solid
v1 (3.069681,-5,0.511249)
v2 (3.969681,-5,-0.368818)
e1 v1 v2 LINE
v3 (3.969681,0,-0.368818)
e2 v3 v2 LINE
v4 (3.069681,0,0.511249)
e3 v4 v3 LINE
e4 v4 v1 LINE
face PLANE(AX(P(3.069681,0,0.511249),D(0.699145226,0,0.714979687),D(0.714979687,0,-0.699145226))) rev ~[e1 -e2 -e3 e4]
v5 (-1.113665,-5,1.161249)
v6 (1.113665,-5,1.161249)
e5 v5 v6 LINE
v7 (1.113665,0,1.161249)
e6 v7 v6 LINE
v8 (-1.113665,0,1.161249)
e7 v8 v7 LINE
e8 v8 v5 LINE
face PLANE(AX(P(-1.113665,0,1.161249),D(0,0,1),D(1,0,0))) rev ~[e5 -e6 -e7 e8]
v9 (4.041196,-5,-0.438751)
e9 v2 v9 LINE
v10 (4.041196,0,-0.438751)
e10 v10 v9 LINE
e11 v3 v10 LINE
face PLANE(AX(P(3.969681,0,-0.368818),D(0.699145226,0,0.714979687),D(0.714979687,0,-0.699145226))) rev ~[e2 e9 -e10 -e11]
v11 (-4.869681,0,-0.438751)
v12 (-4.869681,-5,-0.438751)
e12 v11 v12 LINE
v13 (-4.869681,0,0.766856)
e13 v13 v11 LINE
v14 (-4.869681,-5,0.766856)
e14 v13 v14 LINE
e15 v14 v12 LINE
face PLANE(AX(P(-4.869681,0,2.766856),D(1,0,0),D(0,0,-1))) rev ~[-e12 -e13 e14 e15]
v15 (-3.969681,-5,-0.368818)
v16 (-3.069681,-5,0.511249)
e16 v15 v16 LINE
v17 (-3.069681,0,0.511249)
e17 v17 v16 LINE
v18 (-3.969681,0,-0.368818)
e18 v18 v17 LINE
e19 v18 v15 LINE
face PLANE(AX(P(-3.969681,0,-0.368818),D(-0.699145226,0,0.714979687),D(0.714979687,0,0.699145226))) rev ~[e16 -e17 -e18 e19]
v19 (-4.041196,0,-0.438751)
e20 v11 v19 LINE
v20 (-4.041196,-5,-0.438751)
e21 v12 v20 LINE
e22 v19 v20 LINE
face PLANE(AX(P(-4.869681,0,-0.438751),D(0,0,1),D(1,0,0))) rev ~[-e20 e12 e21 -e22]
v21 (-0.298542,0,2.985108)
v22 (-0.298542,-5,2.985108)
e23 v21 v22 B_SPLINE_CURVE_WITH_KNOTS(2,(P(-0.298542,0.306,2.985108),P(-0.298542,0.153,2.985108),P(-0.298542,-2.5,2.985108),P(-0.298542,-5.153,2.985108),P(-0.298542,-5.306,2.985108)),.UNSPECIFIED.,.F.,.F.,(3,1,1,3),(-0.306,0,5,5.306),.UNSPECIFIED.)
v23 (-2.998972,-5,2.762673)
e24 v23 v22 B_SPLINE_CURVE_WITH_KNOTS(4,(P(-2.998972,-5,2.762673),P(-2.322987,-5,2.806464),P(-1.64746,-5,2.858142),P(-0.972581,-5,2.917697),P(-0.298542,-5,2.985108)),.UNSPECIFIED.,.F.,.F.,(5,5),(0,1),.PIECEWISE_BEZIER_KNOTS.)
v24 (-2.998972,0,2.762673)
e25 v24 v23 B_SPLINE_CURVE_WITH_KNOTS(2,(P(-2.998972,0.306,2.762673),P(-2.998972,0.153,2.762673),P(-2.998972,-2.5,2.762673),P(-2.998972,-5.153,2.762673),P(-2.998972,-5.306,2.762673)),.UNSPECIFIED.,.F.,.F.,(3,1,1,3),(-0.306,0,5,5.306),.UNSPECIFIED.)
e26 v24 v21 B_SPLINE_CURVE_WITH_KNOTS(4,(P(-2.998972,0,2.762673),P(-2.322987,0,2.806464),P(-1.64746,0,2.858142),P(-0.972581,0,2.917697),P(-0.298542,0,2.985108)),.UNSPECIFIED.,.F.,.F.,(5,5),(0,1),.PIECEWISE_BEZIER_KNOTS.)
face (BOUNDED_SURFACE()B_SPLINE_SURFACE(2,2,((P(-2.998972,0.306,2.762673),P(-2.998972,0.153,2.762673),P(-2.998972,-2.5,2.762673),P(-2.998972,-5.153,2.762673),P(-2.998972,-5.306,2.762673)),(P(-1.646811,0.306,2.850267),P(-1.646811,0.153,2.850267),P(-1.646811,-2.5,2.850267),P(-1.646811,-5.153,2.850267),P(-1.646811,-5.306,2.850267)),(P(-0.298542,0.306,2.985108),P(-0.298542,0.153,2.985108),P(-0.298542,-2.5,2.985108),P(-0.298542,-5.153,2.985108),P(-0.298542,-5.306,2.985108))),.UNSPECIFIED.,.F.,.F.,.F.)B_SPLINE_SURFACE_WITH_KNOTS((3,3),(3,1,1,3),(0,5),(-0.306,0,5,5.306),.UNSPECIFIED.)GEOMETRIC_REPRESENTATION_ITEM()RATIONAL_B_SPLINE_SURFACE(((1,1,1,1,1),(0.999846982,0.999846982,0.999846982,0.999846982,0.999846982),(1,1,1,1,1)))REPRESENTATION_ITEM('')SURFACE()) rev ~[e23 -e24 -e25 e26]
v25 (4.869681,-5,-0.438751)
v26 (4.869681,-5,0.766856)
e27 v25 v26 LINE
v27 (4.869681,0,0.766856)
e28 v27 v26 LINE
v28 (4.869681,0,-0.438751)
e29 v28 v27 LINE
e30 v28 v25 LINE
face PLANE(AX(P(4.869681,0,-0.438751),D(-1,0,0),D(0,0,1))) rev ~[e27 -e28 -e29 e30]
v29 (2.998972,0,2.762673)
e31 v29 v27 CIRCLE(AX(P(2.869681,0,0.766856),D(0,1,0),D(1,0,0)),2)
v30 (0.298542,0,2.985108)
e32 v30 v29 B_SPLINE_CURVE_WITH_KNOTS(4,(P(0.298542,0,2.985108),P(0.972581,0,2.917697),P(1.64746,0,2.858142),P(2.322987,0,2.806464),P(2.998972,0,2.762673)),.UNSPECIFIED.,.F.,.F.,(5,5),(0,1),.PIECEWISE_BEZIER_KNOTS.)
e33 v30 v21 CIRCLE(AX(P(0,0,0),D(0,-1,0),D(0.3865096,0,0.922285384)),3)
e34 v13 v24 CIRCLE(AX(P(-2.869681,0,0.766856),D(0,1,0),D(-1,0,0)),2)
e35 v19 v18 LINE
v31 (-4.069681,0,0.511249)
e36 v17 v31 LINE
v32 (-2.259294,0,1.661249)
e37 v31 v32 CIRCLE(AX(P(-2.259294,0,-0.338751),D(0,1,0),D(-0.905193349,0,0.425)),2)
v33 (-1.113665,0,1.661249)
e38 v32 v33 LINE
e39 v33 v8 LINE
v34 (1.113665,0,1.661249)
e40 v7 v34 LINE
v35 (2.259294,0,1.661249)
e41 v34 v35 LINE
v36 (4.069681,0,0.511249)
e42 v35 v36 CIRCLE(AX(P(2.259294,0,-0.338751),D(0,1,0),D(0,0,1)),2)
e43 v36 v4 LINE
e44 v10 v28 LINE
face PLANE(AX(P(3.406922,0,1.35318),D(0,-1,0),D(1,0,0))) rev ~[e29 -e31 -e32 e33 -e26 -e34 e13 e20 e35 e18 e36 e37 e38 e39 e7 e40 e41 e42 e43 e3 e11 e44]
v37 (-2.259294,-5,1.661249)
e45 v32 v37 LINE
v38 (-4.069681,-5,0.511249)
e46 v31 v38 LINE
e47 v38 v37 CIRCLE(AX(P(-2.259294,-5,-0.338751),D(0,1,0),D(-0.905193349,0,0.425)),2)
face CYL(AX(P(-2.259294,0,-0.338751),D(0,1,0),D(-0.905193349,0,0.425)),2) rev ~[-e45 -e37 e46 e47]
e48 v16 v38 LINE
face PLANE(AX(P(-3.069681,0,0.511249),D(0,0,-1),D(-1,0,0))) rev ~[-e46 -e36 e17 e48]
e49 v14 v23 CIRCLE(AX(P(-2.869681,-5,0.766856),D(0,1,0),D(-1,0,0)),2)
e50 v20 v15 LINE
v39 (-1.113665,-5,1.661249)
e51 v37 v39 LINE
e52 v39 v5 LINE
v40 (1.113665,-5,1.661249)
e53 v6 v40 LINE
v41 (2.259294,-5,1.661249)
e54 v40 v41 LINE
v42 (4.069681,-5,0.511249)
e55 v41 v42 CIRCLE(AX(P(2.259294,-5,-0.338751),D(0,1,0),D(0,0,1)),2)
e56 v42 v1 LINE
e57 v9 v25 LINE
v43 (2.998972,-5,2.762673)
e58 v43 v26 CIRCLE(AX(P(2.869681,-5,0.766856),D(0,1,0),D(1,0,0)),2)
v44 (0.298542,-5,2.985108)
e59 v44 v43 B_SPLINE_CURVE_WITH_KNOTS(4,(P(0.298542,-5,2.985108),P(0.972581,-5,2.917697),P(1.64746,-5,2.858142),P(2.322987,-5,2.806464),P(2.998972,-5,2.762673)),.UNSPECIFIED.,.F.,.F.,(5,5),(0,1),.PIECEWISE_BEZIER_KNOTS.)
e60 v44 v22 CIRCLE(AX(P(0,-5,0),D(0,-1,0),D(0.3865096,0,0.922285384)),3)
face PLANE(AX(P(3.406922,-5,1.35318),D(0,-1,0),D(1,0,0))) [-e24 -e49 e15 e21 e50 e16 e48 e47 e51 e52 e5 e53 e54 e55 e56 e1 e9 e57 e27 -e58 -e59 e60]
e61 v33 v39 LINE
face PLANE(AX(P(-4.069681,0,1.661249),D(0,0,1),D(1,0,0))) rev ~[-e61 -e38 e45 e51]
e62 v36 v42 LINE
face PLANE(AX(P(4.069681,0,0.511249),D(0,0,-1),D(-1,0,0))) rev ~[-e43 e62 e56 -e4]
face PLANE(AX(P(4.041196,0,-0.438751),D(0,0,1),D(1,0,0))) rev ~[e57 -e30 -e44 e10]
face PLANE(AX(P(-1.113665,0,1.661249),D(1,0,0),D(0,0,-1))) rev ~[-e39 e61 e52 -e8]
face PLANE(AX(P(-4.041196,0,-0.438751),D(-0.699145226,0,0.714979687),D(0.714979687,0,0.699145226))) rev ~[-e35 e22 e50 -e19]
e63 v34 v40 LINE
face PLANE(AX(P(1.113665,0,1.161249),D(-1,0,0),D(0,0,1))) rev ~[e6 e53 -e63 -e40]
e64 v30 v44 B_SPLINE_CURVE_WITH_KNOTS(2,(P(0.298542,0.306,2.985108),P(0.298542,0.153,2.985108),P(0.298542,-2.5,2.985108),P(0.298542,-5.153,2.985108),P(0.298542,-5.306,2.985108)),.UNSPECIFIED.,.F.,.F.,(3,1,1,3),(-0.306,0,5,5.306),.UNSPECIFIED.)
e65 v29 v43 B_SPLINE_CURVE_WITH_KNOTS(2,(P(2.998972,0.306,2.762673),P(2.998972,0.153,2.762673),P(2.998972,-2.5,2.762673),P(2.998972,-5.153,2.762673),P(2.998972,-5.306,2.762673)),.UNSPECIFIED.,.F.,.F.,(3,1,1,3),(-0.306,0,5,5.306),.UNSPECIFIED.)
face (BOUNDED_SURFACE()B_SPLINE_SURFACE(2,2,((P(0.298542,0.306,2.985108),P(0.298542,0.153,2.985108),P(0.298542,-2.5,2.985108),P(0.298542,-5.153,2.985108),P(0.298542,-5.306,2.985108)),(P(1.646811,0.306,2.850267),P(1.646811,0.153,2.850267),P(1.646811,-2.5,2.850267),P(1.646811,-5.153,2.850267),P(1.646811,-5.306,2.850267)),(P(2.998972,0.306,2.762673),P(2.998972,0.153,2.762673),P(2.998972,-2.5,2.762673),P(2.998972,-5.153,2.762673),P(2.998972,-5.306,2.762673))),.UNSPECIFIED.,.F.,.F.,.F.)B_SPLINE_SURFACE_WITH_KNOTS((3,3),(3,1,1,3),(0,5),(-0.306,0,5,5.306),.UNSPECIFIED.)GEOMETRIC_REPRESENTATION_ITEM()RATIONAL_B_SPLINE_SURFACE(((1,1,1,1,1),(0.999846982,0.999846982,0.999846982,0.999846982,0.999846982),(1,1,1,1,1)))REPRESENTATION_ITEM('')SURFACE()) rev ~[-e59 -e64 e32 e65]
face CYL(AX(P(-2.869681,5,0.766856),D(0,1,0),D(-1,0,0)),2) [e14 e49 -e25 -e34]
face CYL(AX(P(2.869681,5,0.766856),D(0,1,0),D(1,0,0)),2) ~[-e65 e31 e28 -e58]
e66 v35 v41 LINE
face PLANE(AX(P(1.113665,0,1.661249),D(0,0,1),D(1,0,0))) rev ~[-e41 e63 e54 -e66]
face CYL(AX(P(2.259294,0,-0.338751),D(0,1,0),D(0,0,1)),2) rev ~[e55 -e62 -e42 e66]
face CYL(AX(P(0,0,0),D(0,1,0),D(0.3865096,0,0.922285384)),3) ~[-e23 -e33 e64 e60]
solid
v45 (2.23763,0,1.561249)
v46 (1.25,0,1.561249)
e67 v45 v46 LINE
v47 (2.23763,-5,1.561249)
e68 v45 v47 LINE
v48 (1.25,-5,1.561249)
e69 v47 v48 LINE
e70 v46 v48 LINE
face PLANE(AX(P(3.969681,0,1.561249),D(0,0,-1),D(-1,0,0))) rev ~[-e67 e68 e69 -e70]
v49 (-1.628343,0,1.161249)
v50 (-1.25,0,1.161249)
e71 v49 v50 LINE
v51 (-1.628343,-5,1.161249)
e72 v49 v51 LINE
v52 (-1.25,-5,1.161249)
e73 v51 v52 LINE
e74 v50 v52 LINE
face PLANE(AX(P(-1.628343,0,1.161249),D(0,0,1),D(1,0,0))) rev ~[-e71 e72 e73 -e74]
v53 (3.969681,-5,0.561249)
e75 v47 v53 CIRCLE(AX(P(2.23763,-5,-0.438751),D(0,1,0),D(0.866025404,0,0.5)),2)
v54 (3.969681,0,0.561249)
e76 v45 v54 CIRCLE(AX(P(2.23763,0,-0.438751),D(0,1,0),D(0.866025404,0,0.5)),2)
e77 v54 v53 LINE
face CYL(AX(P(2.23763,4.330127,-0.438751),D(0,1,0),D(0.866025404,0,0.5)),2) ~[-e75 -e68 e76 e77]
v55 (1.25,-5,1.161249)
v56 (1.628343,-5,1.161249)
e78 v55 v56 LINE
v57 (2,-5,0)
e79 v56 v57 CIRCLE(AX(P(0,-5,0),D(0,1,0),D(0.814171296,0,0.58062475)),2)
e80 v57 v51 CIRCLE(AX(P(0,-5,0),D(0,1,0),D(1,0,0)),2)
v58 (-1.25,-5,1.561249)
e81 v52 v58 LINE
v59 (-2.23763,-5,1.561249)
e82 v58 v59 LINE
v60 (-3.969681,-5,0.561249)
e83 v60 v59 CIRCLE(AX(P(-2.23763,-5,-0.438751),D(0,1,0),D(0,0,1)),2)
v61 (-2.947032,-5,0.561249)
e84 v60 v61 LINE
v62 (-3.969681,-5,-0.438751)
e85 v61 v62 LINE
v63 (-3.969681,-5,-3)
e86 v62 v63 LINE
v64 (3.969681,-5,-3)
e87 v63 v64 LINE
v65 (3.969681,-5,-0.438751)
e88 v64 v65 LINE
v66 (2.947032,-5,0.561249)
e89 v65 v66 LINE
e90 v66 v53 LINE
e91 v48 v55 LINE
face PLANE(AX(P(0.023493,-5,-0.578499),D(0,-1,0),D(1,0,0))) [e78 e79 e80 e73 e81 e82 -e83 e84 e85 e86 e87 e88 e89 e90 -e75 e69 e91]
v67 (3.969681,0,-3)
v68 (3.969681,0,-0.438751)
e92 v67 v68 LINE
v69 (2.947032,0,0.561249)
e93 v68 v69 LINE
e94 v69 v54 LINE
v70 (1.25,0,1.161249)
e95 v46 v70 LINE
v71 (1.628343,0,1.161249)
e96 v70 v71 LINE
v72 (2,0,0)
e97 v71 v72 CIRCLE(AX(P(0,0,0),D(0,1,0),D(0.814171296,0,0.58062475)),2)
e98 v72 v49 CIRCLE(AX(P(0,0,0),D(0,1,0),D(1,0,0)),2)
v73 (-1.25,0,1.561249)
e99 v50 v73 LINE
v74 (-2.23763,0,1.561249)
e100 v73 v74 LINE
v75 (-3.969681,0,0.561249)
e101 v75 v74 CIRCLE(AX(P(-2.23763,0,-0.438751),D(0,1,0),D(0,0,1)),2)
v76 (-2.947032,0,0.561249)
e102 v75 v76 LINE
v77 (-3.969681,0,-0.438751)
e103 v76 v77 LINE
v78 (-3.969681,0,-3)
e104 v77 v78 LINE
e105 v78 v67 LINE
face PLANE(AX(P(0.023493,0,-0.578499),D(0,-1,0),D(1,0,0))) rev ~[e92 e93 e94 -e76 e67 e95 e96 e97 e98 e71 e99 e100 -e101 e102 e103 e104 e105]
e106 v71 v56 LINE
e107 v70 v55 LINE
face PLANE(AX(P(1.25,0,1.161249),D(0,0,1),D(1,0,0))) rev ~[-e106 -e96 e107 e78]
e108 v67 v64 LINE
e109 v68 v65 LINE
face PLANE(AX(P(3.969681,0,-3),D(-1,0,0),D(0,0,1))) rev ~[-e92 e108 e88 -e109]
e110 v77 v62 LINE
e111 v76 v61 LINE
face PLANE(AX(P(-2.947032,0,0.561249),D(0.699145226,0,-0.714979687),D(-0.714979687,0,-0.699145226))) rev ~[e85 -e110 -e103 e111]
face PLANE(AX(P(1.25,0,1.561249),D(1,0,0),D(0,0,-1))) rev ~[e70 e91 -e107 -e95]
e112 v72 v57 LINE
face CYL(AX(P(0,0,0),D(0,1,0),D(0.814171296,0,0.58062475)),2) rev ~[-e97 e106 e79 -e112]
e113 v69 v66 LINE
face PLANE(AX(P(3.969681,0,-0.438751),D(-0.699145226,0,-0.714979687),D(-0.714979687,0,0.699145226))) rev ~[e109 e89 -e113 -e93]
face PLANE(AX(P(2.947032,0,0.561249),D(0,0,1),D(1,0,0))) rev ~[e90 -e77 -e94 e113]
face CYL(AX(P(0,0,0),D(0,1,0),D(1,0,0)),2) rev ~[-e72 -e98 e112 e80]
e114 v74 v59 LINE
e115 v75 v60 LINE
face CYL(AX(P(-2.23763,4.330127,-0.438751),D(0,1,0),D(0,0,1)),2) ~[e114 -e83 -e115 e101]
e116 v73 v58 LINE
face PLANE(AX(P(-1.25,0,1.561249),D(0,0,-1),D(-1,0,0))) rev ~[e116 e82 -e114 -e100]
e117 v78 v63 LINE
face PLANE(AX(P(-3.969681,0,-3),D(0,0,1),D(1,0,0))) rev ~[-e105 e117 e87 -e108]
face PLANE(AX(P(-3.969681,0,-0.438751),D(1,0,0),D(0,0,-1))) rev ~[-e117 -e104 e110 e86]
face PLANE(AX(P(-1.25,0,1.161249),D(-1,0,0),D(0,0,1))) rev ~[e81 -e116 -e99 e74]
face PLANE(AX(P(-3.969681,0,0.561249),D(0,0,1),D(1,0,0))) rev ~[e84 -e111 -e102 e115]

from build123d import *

# Parameters (mm, degrees)
F1_DEPTH      = 5
F2_T1_DEPTH   = 13.6602540378
F2_2_T1_DEPTH = 5
F2_2_T3_DEPTH = 5
F2_2_T5_DEPTH = 15
F2_2_T7_DEPTH = 15
F3_R          = 77.4463937181


# Not quite as in the source:
# - a fillet or chamfer that OpenCascade refuses, or shapes differently, is made with other operations: its cross-section is extruded or revolved along the edge and cut away or added
# - a feature names something its author has since deleted; it is built from what else it names


with BuildPart() as f1:
    # F0 (on Front) → F1 (new body)
    with BuildSketch(Plane.XZ):
        with BuildLine():
            ThreePointArc((1.6283425928, 1.1612494996), (1.9048208821, 0.609637111), (2, 0))
            ThreePointArc((2, 0), (-0.609637111, -1.9048208821), (-1.6283425928, 1.1612494996))
            ThreePointArc((-1.6283425928, 1.1612494996), (-1.4530017276, 1.3743311026), (-1.25, 1.5612494996))
            Line((-1.25, 1.5612494996), (-2.5617376915, 1.5612494996))
            ThreePointArc((-2.5617376915, 1.5612494996), (-2.7993993156, 1.0785932838), (-2.9470322359, 0.5612494996))
            ThreePointArc((-2.9470322359, 0.5612494996), (-2.3112494996, -1.9126227413), (0, -3))
            ThreePointArc((0, -3), (2.1213203436, -2.1213203436), (3, 0))
            ThreePointArc((3, 0), (2.9867287044, 0.2818716839), (2.9470322359, 0.5612494996))
            ThreePointArc((2.9470322359, 0.5612494996), (2.7993993156, 1.0785932838), (2.5617376915, 1.5612494996))
            Line((2.5617376915, 1.5612494996), (1.25, 1.5612494996))
            ThreePointArc((1.25, 1.5612494996), (1.4530017276, 1.3743311026), (1.6283425928, 1.1612494996))
        make_face()
        with BuildLine():
            ThreePointArc((0, -3), (-2.3112494996, -1.9126227413), (-2.9470322359, 0.5612494996))
            Line((-2.9470322359, 0.5612494996), (-3.9696805516, -0.4387505004))
            Line((-3.9696805516, -0.4387505004), (-3.9696805516, -3))
            Line((-3.9696805516, -3), (0, -3))
        make_face()
        with BuildLine():
            ThreePointArc((-2.9470322359, 0.5612494996), (-2.7993993156, 1.0785932838), (-2.5617376915, 1.5612494996))
            Line((-2.5617376915, 1.5612494996), (-3.9696805516, 1.5612494996))
            Line((-3.9696805516, 1.5612494996), (-3.9696805516, 0.5612494996))
            Line((-3.9696805516, 0.5612494996), (-2.9470322359, 0.5612494996))
        make_face()
        with BuildLine():
            Line((3.9696805516, 1.5612494996), (2.5617376915, 1.5612494996))
            ThreePointArc((2.5617376915, 1.5612494996), (2.7993993156, 1.0785932838), (2.9470322359, 0.5612494996))
            Line((2.9470322359, 0.5612494996), (3.9696805516, 0.5612494996))
            Line((3.9696805516, 0.5612494996), (3.9696805516, 1.5612494996))
        make_face()
        with BuildLine():
            Line((3.9696805516, -0.4387505004), (2.9470322359, 0.5612494996))
            ThreePointArc((2.9470322359, 0.5612494996), (2.9867287044, 0.2818716839), (3, 0))
            ThreePointArc((3, 0), (2.1213203436, -2.1213203436), (0, -3))
            Line((0, -3), (3.9696805516, -3))
            Line((3.9696805516, -3), (3.9696805516, -0.4387505004))
        make_face()
        with BuildLine():
            ThreePointArc((-1.25, 1.5612494996), (-1.4530017276, 1.3743311026), (-1.6283425928, 1.1612494996))
            Line((-1.6283425928, 1.1612494996), (-1.25, 1.1612494996))
            Line((-1.25, 1.1612494996), (-1.25, 1.5612494996))
        make_face()
        with BuildLine():
            Line((1.25, 1.1612494996), (1.6283425928, 1.1612494996))
            ThreePointArc((1.6283425928, 1.1612494996), (1.4530017276, 1.3743311026), (1.25, 1.5612494996))
            Line((1.25, 1.5612494996), (1.25, 1.1612494996))
        make_face()
    extrude(amount=F1_DEPTH)

    # F2: fillet of radius 2 on 2 edges, made by hand

    # F2_s2 → F2_t1 (cut)
    with BuildSketch(Plane.XZ.offset(-4.3301270189)):
        with BuildLine():
            ThreePointArc((-2.237629744, 1.5612494996), (-3.237629744, 1.2933003072), (-3.9696805516, 0.5612494996))
            Line((-3.9696805516, 0.5612494996), (-3.9696805516, 1.5612494996))
            Line((-3.9696805516, 1.5612494996), (-2.237629744, 1.5612494996))
        make_face()
        with BuildLine():
            ThreePointArc((3.9696805516, 0.5612494996), (3.237629744, 1.2933003072), (2.237629744, 1.5612494996))
            Line((2.237629744, 1.5612494996), (3.9696805516, 1.5612494996))
            Line((3.9696805516, 1.5612494996), (3.9696805516, 0.5612494996))
        make_face()
    extrude(amount=F2_T1_DEPTH, mode=Mode.SUBTRACT)


with BuildPart() as f1b:
    # F0 (on Front) → F1, piece 2 (new body)
    with BuildSketch(Plane.XZ):
        with BuildLine():
            Line((-4.0696805516, 1.6612494996), (-2.4980492589, 1.6612494996))
            ThreePointArc((-2.4980492589, 1.6612494996), (-1.9105132383, 2.3129935508), (-1.1595288015, 2.7668561507))
            Line((-1.1595288015, 2.7668561507), (-4.8696805516, 2.7668561507))
            Line((-4.8696805516, 2.7668561507), (-4.8696805516, -0.4387505004))
            Line((-4.8696805516, -0.4387505004), (-4.0411964515, -0.4387505004))
            Line((-4.0411964515, -0.4387505004), (-3.9696805516, -0.3688184438))
            Line((-3.9696805516, -0.3688184438), (-3.9696805516, 0.5112494996))
            Line((-3.9696805516, 0.5112494996), (-4.0696805516, 0.5112494996))
            Line((-4.0696805516, 0.5112494996), (-4.0696805516, 1.6612494996))
        make_face()
        Polygon((-3.0696805516, 0.5112494996), (-3.9696805516, 0.5112494996), (-3.9696805516, -0.3688184438), align=None)
        with BuildLine():
            ThreePointArc((-1.1136651652, 1.6612494996), (0, 2), (1.1136651652, 1.6612494996))
            Line((1.1136651652, 1.6612494996), (2.4980492589, 1.6612494996))
            ThreePointArc((2.4980492589, 1.6612494996), (1.9105132383, 2.3129935508), (1.1595288015, 2.7668561507))
            ThreePointArc((1.1595288015, 2.7668561507), (0, 3), (-1.1595288015, 2.7668561507))
            ThreePointArc((-1.1595288015, 2.7668561507), (-1.9105132383, 2.3129935508), (-2.4980492589, 1.6612494996))
            Line((-2.4980492589, 1.6612494996), (-1.1136651652, 1.6612494996))
        make_face()
        with BuildLine():
            ThreePointArc((1.1595288015, 2.7668561507), (1.9105132383, 2.3129935508), (2.4980492589, 1.6612494996))
            Line((2.4980492589, 1.6612494996), (4.0696805516, 1.6612494996))
            Line((4.0696805516, 1.6612494996), (4.0696805516, 0.5112494996))
            Line((4.0696805516, 0.5112494996), (3.9696805516, 0.5112494996))
            Line((3.9696805516, 0.5112494996), (3.9696805516, -0.3688184438))
            Line((3.9696805516, -0.3688184438), (4.0411964515, -0.4387505004))
            Line((4.0411964515, -0.4387505004), (4.8696805516, -0.4387505004))
            Line((4.8696805516, -0.4387505004), (4.8696805516, 2.7668561507))
            Line((4.8696805516, 2.7668561507), (1.1595288015, 2.7668561507))
        make_face()
        Polygon((3.9696805516, -0.3688184438), (3.9696805516, 0.5112494996), (3.0696805516, 0.5112494996), align=None)
        with BuildLine():
            Line((1.1136651652, 1.1612494996), (1.1136651652, 1.6612494996))
            ThreePointArc((1.1136651652, 1.6612494996), (0, 2), (-1.1136651652, 1.6612494996))
            Line((-1.1136651652, 1.6612494996), (-1.1136651652, 1.1612494996))
            Line((-1.1136651652, 1.1612494996), (0, 1.1612494996))
            Line((0, 1.1612494996), (1.1136651652, 1.1612494996))
        make_face()
    extrude(amount=F1_DEPTH)

    # F2#2: fillet of radius 2 on 4 edges, made by hand

    # F2_2_s2 → F2_2_t1 (join)
    with BuildSketch(Plane.XZ):
        with BuildLine():
            ThreePointArc((-4.0696805516, 0.5112494996), (-3.331674382, 1.3494438012), (-2.2592938526, 1.6612494996))
            Line((-2.2592938526, 1.6612494996), (-4.0696805516, 1.6612494996))
            Line((-4.0696805516, 1.6612494996), (-4.0696805516, 0.5112494996))
        make_face()
    extrude(amount=F2_2_T1_DEPTH)

    # F2_2_s4 → F2_2_t3 (join)
    with BuildSketch(Plane.XZ):
        with BuildLine():
            ThreePointArc((2.2592938526, 1.6612494996), (3.331674382, 1.3494438012), (4.0696805516, 0.5112494996))
            Line((4.0696805516, 0.5112494996), (4.0696805516, 1.6612494996))
            Line((4.0696805516, 1.6612494996), (2.2592938526, 1.6612494996))
        make_face()
    extrude(amount=F2_2_T3_DEPTH)

    # F2_2_s6 → F2_2_t5 (cut)
    with BuildSketch(Plane.XZ.offset(-5)):
        with BuildLine():
            ThreePointArc((4.8696805516, 0.7668561507), (4.283894114, 2.181069713), (2.8696805516, 2.7668561507))
            Line((2.8696805516, 2.7668561507), (4.8696805516, 2.7668561507))
            Line((4.8696805516, 2.7668561507), (4.8696805516, 0.7668561507))
        make_face()
    extrude(amount=F2_2_T5_DEPTH, mode=Mode.SUBTRACT)

    # F2_2_s8 → F2_2_t7 (cut)
    with BuildSketch(Plane.XZ.offset(-5)):
        with BuildLine():
            ThreePointArc((-4.8696805516, 0.7668561507), (-4.283894114, 2.181069713), (-2.8696805516, 2.7668561507))
            Line((-2.8696805516, 2.7668561507), (-4.8696805516, 2.7668561507))
            Line((-4.8696805516, 2.7668561507), (-4.8696805516, 0.7668561507))
        make_face()
    extrude(amount=F2_2_T7_DEPTH, mode=Mode.SUBTRACT)

    # F3
    f3_edges = [f1b.edges().sort_by_distance(p)[0] for p in [
        (1.159529, -2.5, 2.766856),
        (-1.159529, -2.5, 2.766856),
    ]]
    fillet(f3_edges, radius=F3_R)


solid = Compound([f1.part, f1b.part])
